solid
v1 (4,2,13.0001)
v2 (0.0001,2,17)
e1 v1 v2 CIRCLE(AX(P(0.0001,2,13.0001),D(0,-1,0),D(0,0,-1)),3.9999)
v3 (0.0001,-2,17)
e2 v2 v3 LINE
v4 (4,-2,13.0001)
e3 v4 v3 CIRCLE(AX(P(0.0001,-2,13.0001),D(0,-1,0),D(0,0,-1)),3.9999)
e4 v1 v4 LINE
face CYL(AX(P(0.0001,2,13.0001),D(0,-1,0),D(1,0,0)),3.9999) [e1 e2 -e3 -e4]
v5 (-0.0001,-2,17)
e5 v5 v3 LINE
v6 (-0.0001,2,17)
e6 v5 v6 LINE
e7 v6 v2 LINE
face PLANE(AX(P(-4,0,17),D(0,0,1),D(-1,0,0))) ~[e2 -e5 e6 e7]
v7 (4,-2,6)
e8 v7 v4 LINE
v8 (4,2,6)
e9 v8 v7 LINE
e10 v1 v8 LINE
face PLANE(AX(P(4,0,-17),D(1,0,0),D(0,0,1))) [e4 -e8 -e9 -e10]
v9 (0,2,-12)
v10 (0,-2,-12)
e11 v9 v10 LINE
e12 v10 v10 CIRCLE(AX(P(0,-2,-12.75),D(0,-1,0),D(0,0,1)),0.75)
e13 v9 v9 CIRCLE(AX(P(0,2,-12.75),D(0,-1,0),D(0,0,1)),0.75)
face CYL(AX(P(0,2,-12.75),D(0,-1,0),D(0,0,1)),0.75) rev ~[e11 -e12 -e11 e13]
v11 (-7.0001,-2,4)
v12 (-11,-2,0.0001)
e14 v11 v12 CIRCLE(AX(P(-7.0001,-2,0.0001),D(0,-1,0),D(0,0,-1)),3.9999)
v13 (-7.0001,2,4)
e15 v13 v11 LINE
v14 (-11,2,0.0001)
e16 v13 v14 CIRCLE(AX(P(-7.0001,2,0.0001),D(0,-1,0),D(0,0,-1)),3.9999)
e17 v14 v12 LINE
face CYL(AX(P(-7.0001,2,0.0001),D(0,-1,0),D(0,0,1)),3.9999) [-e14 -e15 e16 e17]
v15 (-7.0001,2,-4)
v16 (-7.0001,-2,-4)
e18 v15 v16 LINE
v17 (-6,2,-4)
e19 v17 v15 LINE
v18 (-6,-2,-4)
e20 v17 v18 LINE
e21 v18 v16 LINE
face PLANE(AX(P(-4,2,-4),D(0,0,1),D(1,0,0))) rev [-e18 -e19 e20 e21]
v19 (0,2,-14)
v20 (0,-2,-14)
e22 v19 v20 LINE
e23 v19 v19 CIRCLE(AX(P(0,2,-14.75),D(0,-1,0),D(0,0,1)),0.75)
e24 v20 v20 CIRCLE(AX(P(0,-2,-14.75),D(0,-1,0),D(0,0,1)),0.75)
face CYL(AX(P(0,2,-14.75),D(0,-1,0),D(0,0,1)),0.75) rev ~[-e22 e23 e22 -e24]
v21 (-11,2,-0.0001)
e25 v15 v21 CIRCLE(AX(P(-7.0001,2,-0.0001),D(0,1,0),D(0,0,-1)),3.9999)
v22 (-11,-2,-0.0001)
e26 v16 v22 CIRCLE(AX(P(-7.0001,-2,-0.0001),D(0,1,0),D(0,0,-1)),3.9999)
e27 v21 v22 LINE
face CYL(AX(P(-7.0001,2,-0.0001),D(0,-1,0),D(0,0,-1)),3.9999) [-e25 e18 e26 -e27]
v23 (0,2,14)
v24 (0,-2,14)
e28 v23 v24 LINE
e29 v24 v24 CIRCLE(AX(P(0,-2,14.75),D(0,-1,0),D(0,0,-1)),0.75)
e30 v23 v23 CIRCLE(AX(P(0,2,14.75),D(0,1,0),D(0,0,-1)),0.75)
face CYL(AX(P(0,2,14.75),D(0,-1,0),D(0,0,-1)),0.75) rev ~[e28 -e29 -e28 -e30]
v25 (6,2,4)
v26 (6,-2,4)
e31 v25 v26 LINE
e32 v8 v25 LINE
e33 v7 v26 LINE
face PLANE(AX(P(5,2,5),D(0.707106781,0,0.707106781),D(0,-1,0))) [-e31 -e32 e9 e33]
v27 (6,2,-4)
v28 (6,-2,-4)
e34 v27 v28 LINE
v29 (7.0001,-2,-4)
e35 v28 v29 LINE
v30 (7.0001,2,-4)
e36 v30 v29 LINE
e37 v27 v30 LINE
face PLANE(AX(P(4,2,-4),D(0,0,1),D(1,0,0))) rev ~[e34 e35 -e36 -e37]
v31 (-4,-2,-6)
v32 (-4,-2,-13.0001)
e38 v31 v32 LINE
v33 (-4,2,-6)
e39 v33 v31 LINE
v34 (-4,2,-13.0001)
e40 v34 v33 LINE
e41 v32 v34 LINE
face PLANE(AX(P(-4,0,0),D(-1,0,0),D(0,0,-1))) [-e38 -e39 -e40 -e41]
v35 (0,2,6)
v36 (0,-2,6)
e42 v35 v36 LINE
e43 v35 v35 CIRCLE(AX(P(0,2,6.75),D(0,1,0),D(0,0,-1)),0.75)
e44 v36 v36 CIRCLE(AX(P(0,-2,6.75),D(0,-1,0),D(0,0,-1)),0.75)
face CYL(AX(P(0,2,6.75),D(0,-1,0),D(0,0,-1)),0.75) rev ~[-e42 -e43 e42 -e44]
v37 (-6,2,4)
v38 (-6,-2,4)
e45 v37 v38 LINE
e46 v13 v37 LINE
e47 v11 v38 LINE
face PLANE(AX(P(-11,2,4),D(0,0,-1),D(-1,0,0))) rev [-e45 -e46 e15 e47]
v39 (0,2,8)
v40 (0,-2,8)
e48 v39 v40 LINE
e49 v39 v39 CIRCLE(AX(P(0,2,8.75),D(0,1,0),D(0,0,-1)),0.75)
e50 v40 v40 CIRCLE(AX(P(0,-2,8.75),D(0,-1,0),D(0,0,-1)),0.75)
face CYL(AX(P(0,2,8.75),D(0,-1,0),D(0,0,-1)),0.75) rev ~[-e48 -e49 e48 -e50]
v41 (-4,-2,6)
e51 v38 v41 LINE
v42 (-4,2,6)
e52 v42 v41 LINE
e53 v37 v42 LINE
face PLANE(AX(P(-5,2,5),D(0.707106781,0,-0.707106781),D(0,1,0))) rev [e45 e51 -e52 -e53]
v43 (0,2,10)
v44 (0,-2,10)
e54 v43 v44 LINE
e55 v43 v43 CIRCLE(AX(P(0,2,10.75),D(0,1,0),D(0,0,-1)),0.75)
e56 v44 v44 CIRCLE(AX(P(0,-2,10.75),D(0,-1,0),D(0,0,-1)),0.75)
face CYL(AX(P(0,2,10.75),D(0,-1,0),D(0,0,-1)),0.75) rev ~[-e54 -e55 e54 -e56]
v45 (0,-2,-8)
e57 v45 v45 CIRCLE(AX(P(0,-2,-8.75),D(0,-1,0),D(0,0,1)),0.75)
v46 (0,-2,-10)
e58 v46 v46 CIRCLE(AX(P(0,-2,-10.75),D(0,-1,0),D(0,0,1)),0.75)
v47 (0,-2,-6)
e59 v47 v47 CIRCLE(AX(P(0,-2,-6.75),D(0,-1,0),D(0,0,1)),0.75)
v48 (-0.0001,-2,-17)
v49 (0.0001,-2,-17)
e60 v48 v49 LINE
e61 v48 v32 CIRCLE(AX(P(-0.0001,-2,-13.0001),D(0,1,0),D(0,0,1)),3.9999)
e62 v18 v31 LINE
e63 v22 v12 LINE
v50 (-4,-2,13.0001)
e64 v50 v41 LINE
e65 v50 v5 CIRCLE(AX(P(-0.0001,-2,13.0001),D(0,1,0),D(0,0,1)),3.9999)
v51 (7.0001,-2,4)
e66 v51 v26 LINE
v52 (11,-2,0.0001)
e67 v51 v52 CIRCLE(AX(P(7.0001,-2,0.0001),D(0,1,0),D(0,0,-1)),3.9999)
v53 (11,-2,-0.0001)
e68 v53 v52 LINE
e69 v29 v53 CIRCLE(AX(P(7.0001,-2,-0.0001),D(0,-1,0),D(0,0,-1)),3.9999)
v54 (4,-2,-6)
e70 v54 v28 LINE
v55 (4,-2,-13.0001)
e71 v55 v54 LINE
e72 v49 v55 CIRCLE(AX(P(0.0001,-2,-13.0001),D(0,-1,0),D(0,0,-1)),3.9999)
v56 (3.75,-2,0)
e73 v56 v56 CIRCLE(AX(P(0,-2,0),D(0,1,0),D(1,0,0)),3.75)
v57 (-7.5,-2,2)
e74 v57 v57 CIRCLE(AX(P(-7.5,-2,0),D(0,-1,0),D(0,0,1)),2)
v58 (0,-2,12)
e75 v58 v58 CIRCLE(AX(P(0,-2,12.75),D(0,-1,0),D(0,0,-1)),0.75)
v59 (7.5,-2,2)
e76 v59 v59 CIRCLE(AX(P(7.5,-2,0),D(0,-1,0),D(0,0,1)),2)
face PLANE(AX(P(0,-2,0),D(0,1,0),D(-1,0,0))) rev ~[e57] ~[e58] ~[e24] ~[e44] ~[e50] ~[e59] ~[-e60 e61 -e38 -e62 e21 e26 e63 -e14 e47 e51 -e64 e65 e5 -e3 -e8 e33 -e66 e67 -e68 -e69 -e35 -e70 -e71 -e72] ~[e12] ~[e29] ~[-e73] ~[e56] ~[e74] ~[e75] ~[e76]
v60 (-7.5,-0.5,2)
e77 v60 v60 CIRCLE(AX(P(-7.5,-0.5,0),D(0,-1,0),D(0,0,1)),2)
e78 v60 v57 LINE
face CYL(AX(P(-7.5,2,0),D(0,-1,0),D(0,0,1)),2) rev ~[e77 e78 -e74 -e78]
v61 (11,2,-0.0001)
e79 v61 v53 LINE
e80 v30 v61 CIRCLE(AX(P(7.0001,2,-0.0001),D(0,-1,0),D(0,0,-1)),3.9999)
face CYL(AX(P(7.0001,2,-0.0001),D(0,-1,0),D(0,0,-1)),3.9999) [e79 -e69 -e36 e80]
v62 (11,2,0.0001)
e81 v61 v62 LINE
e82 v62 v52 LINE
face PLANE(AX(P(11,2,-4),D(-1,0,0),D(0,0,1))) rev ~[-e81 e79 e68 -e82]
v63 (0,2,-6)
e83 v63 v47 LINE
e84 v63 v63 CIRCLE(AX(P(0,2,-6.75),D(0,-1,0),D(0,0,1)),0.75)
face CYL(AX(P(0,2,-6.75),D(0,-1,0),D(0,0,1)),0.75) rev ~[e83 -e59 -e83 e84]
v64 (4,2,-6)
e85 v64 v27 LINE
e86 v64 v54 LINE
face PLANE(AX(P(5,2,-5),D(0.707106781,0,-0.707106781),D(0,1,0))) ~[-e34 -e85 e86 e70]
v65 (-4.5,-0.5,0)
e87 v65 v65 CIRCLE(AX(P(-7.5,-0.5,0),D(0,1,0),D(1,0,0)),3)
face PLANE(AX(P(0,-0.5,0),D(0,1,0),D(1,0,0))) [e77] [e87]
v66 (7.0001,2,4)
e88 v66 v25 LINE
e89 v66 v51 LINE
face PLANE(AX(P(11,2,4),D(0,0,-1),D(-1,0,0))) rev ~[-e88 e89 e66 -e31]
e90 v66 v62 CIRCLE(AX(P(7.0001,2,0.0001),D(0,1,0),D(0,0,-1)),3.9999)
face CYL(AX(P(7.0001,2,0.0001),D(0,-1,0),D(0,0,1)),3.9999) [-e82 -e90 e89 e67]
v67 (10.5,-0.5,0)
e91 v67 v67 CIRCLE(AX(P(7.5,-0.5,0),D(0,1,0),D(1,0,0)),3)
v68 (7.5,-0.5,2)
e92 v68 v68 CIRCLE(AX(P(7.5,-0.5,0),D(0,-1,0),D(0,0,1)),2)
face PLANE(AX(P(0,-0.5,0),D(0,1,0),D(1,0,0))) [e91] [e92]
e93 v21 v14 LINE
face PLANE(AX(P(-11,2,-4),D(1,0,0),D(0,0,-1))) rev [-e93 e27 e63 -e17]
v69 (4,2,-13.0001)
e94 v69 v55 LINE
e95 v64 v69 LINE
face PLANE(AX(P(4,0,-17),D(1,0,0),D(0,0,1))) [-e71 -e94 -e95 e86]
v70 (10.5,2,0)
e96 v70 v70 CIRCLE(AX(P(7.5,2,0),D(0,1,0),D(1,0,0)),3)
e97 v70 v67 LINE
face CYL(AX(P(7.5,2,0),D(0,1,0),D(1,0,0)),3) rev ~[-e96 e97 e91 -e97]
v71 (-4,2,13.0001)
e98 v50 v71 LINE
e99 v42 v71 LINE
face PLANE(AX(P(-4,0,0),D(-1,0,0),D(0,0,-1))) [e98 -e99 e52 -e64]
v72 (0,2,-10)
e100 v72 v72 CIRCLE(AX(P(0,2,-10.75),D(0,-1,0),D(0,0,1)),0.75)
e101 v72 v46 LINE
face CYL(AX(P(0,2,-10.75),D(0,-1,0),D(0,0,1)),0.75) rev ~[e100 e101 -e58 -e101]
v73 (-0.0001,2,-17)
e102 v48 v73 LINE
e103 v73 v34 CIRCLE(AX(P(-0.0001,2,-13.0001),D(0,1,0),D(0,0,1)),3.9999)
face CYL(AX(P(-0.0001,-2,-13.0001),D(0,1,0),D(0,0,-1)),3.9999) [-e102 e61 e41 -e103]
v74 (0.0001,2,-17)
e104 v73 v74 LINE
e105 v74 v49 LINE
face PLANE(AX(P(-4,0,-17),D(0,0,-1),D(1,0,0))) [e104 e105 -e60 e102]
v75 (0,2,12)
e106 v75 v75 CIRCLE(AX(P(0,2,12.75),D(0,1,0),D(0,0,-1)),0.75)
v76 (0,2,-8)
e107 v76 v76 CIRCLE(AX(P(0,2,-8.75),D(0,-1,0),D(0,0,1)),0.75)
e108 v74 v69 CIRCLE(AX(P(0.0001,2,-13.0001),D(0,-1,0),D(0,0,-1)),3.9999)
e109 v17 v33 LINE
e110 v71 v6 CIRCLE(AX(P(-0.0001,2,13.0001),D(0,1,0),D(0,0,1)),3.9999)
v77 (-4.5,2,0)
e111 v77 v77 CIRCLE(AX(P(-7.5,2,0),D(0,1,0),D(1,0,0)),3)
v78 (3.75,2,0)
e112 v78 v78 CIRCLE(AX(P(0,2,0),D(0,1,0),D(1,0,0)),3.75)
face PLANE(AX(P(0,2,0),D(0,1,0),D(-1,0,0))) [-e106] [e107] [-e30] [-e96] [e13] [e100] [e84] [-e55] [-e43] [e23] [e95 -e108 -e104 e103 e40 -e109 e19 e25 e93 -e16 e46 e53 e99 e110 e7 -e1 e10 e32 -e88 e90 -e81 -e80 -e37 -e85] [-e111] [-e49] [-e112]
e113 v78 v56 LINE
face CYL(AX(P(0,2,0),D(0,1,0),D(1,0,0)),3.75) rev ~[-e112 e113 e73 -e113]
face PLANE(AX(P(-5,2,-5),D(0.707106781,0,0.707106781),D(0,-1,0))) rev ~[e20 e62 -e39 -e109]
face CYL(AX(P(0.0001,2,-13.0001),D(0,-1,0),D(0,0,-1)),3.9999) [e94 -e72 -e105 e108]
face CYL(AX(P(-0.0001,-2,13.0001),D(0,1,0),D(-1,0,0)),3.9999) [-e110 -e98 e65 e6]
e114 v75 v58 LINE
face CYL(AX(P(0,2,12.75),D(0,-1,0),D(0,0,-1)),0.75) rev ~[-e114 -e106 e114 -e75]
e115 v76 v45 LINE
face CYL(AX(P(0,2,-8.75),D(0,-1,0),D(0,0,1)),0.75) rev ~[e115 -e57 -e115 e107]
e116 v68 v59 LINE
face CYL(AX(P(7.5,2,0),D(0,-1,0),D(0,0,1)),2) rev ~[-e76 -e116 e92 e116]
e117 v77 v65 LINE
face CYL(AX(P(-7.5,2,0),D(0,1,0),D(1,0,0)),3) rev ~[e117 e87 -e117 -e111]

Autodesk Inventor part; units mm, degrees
ref_plane "YZ Plane" through (0, 0, 0) normal (1, 0, 0) x (0, 1, 0)
ref_plane "XZ Plane" through (0, 0, 0) normal (0, 1, 0) x (-1, 0, 0)
ref_plane "XY Plane" through (0, 0, 0) normal (0, 0, 1) x (1, 0, 0)
sketch "Sketch1" plane through (0, 0, 0) normal (0, 1, 0) x (-1, 0, 0)
  line L0 (4, -17) -> (-4, -17)
  line L1 (-4, -17) -> (-4, 0)
  line L2 (-4, 0) -> (4, 0)
  line L3 (4, 0) -> (4, -17)
  line L4 (4, -17) -> (-4, 0) construction
  line L5 (-4, -17) -> (4, 0) construction
  point P0 (0, 0)
  point P1 (0, -8.5)
  dimension "d0" = 8
  dimension "d1" = 17
  dimension "d19" = 0
  dimension "d20" = 0
extrude "Extrusion1" add sketch "Sketch1" along normal mid plane 4
sketch "Sketch2" plane through (0, 2, 0) normal (0, 1, 0) x (1, 0, 0)
  line L0 (-4, 17) -> (-4, 0) projected
  line L1 (-4, 0) -> (4, 0) projected
  line L2 (4, 0) -> (4, 17) projected
  line L3 (4, 17) -> (-4, 17) projected
  point P0 (0, 0)
  point P1 (0, 6.75)
  point P2 (0, 8.75)
  point P3 (0, 10.75)
  point P4 (0, 12.75)
  point P5 (0, 14.75)
  dimension "d4" = 6.75
  dimension "d7" = 2
hole "Hole1" at (0, 2, -6.75) at (0, 2, -8.75) at (0, 2, -10.75) at (0, 2, -12.75) at (0, 2, -14.75) direction (0, -1, 0) diameter 1.5 end through all
fillet "Fillet1" radius 4 2 edges at (-4, 0, -17) (4, 0, -17)
mirror "Mirror1" about plane through (0, 0, 0) normal (0, 0, 1) of "Extrusion1", "Hole1", "Fillet1"
sketch "Sketch3" plane through (0, 2, 0) normal (0, 1, 0) x (1, 0, 0)
  line L0 (11, -4) -> (4, -4)
  line L1 (4, -4) -> (4, 4)
  line L2 (4, 4) -> (11, 4)
  line L3 (11, 4) -> (11, -4)
  line L4 (11, -4) -> (4, 4) construction
  line L5 (4, -4) -> (11, 4) construction
  line L6 (4, 13) -> (4, -13) projected
  point P0 (0, 0)
  point P1 (7.5, 0)
  point P2 (4, -14)
  dimension "d22" = 0
  dimension "d23" = 0
  dimension "d24" = 8
  dimension "d25" = 7.5
extrude "Extrusion2" add sketch "Sketch3" against normal blind 4
fillet "Fillet2" radius 4 2 edges at (11, 0, -4) (11, 0, 4)
sketch "Sketch4" plane through (0, 2, 0) normal (0, 1, 0) x (1, 0, 0)
  point P0 (0, 0)
  point P1 (7.5, 0)
  dimension "d29" = 7.5
hole "Hole2" at (7.5, 2, 0) direction (0, -1, 0) diameter 4 end through all
mirror "Mirror2" about plane through (0, 0, 0) normal (1, 0, 0) of "Extrusion2", "Fillet2", "Hole2"
sketch "Sketch5" plane through (0, 2, 0) normal (0, 1, 0) x (1, 0, 0)
  circle A0 centre (0, 0) radius 3.75
  dimension "d37" = 7.5
extrude "Extrusion3" cut sketch "Sketch5" against normal through all
chamfer "Chamfer1" distance 2 angle 45 4 edges at (4, 0, 4) (-4, 0, 4) (-4, 0, -4) (4, 0, -4)
sketch "Sketch6" plane through (0, 2, 0) normal (0, 1, 0) x (1, 0, 0)
  circle A0 centre (0, 0) radius 3.75 projected
  circle A1 centre (-7.5, 0) radius 2 projected
  arc A2 (-7, 4) -> (-7, -4) centre (-7, 0) ccw projected
  line L0 (-6, -4) -> (-7, -4) projected
  line L1 (-4, -6) -> (-6, -4) projected
  line L2 (-4, -6) -> (-4, -13) projected
  arc A3 (-4, -13) -> (4, -13) centre (0, -13) ccw projected
  line L3 (4, -6) -> (4, -13) projected
  line L4 (6, -4) -> (4, -6) projected
  line L5 (6, -4) -> (7, -4) projected
  arc A4 (7, -4) -> (7, 4) centre (7, 0) ccw projected
  line L6 (7, 4) -> (6, 4) projected
  line L7 (4, 6) -> (6, 4) projected
  line L8 (4, 13) -> (4, 6) projected
  arc A5 (4, 13) -> (-4, 13) centre (0, 13) ccw projected
  line L9 (-4, 13) -> (-4, 6) projected
  line L10 (-6, 4) -> (-4, 6) projected
  line L11 (-7, 4) -> (-6, 4) projected
  circle A6 centre (7.5, 0) radius 2 projected
  circle A7 centre (0, 12.75) radius 0.75 projected
  circle A8 centre (0, 8.75) radius 0.75 projected
  circle A9 centre (0, 6.75) radius 0.75 projected
  circle A10 centre (0, 10.75) radius 0.75 projected
  circle A11 centre (0, 14.75) radius 0.75 projected
  circle A12 centre (0, -8.75) radius 0.75 projected
  circle A13 centre (0, -6.75) radius 0.75 projected
  circle A14 centre (0, -10.75) radius 0.75 projected
  circle A15 centre (0, -14.75) radius 0.75 projected
  circle A16 centre (0, -12.75) radius 0.75 projected
  circle A17 centre (-7.5, 0) radius 3
  circle A18 centre (7.5, 0) radius 3
  dimension "d43" = 6
  dimension "d44" = 6
extrude "Extrusion4" cut sketch "Sketch6" against normal blind 2.5 contours A17 | A18
properties part number "JointPlate3"
